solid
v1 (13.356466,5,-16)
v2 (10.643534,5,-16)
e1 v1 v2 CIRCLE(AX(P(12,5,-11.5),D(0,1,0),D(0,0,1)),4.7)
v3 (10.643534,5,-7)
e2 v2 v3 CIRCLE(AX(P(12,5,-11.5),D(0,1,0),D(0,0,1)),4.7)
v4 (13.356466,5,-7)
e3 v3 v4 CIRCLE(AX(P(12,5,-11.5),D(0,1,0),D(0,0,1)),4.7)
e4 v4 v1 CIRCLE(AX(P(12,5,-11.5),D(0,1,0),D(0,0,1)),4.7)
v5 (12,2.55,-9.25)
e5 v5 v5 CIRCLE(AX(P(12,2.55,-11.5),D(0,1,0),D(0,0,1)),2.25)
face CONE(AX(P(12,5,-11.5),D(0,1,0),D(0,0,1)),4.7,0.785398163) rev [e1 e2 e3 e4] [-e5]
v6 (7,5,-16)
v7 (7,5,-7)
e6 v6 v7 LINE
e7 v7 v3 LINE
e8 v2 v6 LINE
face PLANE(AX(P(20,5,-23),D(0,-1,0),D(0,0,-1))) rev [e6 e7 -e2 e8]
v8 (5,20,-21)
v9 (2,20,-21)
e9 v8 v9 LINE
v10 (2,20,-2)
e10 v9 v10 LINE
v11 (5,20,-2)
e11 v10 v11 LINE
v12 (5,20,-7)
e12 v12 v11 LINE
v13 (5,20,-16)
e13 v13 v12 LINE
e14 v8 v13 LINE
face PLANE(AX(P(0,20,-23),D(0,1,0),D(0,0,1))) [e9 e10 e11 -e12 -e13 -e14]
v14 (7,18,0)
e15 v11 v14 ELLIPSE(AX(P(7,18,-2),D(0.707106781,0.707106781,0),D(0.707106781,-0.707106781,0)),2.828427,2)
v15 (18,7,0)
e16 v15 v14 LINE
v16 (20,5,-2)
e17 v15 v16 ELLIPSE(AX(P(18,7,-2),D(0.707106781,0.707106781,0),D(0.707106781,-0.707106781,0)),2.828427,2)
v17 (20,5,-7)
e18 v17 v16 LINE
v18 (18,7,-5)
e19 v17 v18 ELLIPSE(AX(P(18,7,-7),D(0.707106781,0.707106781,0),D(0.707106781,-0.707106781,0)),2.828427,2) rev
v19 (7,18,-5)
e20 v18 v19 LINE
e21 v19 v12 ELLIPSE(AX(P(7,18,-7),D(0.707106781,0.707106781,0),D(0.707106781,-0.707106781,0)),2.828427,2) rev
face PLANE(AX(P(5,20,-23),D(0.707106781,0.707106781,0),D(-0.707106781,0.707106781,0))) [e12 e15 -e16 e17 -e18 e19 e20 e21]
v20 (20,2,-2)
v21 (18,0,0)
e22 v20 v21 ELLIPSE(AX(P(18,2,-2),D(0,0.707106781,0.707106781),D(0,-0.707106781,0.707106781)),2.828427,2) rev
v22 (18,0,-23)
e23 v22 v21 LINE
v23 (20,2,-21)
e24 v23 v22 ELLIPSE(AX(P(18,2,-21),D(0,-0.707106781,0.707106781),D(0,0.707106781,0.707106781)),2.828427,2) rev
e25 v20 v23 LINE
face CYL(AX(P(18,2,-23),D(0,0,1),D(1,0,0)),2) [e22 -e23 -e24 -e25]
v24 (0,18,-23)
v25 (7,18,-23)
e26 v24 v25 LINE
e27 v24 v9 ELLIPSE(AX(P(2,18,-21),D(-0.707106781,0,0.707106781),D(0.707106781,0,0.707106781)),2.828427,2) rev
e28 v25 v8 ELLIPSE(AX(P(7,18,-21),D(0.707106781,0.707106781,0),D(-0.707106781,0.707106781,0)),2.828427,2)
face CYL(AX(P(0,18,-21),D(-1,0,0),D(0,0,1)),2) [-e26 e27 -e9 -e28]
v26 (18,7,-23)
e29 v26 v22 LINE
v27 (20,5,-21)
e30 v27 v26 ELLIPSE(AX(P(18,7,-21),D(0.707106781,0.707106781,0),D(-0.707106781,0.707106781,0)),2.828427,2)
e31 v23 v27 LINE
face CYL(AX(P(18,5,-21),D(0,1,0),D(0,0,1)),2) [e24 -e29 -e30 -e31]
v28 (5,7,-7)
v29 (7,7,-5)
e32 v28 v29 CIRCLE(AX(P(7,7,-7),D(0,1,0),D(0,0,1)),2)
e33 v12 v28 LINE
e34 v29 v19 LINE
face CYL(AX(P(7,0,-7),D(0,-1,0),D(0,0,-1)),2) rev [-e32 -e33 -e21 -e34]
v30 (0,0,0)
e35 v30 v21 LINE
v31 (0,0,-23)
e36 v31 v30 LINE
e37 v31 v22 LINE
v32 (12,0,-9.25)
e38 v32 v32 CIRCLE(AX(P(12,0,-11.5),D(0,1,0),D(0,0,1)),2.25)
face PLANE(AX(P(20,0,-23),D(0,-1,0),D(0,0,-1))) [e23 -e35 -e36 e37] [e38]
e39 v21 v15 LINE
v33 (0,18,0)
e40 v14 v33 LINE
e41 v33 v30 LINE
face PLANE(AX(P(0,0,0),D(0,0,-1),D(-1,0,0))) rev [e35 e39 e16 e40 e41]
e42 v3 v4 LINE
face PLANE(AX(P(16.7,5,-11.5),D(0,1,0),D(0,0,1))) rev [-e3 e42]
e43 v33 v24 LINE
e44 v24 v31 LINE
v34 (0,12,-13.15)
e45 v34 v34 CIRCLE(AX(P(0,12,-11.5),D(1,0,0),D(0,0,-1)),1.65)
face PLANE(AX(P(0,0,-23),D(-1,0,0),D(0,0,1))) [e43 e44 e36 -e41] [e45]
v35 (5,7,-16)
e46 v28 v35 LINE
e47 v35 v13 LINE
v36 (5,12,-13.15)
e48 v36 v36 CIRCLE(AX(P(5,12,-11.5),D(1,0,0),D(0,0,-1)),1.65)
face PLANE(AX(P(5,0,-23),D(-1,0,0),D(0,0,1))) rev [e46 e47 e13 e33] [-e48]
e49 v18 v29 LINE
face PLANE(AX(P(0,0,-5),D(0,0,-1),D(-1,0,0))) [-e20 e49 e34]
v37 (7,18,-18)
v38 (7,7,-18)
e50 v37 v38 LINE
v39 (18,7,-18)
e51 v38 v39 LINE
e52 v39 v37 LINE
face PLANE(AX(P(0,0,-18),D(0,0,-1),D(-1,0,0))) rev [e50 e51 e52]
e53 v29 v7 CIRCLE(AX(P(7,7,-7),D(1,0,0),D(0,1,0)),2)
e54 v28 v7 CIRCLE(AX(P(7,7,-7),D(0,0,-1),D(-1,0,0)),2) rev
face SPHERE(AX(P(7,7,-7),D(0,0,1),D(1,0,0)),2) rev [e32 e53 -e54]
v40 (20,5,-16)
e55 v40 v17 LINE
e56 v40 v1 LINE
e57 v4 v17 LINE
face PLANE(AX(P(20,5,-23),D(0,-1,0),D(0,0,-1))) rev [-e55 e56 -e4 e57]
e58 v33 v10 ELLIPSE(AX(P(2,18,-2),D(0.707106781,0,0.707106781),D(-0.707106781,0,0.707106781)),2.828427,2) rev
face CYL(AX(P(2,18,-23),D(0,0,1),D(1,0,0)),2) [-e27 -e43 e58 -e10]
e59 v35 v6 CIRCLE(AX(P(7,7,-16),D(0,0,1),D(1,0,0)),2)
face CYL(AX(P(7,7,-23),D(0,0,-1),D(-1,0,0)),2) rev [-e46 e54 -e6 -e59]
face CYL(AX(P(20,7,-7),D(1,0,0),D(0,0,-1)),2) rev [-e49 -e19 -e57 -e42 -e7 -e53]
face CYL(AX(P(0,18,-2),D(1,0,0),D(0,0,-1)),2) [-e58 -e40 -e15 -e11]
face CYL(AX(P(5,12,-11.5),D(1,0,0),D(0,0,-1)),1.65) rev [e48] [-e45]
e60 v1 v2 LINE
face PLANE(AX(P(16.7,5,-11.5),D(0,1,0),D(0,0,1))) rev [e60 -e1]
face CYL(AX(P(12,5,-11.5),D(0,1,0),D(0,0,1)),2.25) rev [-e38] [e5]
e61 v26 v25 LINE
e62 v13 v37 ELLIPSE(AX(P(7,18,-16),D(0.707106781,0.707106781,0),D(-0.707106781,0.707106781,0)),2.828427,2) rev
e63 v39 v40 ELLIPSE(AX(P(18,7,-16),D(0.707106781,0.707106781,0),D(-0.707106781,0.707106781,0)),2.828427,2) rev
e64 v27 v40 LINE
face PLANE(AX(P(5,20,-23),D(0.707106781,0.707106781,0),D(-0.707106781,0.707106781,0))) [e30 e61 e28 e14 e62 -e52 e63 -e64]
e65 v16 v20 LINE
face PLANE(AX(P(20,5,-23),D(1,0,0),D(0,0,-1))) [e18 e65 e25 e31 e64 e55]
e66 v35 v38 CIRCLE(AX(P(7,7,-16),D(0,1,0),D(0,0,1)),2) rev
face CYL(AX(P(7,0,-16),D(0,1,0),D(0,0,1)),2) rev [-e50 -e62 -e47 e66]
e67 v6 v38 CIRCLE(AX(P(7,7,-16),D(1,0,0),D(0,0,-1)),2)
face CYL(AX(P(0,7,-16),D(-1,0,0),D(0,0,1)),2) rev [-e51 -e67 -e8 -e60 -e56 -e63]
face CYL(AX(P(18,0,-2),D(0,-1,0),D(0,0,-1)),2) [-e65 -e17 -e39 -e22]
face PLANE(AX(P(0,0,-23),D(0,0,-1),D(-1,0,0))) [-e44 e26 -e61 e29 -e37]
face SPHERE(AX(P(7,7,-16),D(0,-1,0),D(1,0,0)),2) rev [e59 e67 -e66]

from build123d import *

# Parameters (mm, degrees)
BOSS_EXTRUDE2_DEPTH         = 23
SHELL1_START                = 5
SHELL1_OUTLINE_W            = 16
SHELL1_OUTLINE_H            = 13
SHELL1_DEPTH                = 15
FILLET1_R                   = 2
FILLET3_R                   = 2
TAP_DRILL_FOR_M4X0_7_TAP1_D = 3.3


# Read off the part's stored shape, not the designer's step: Shell1
with BuildPart() as part:
    # Sketch1 → Boss-Extrude2 (new body)
    with BuildSketch(Plane.XY):
        Polygon((0, 0), (0, 20), (5, 20), (20, 5), (20, 0), align=None)
    extrude(amount=-BOSS_EXTRUDE2_DEPTH)

    # Shell1 outline → Shell1 (cut)
    with BuildSketch(Plane(origin=(0, 0, 0), x_dir=(1, 0, 0), z_dir=(0, 1, 0)).offset(SHELL1_START)):
        with Locations((13, 11.5)):
            Rectangle(SHELL1_OUTLINE_W, SHELL1_OUTLINE_H)
    extrude(amount=SHELL1_DEPTH, mode=Mode.SUBTRACT)

    # Fillet1
    fillet1_edges = [part.edges().sort_by_distance(p)[0] for p in [
        (12.5, 5, -18),
        (5, 12.5, -18),
        (5, 5, -11.5),
        (12.5, 5, -5),
        (5, 12.5, -5),
    ]]
    fillet(fillet1_edges, radius=FILLET1_R)

    # Fillet3
    fillet3_edges = [part.edges().sort_by_distance(p)[0] for p in [
        (2.5, 20, -23),
        (2.5, 20, 0),
        (20, 2.5, 0),
        (20, 2.5, -23),
        (0, 20, -11.5),
        (20, 0, -11.5),
    ]]
    fillet(fillet3_edges, radius=FILLET3_R)

    # Tap Drill for M4x0.7 Tap1 (through all)
    with Locations(Plane(origin=(5, 12, -11.5), x_dir=(0, 0, 1), z_dir=(1, 0, 0))):
        with Locations((0, 0)):
            Hole(TAP_DRILL_FOR_M4X0_7_TAP1_D / 2)

    # Sketch9 → CSK for M4 Flat Head Machine Screw2 (revolve, cut)
    with BuildSketch(Plane(origin=(12, 5, -11.5), x_dir=(0, 0, 1), z_dir=(1, 0, 0))):
        Polygon((0, 0), (0, 5), (2.25, 5), (2.25, 2.45), (4.7, 0), align=None)
    revolve(axis=Axis((12, 11.35, -11.5), (0, -1, 0)), mode=Mode.SUBTRACT)


solid = part.part
